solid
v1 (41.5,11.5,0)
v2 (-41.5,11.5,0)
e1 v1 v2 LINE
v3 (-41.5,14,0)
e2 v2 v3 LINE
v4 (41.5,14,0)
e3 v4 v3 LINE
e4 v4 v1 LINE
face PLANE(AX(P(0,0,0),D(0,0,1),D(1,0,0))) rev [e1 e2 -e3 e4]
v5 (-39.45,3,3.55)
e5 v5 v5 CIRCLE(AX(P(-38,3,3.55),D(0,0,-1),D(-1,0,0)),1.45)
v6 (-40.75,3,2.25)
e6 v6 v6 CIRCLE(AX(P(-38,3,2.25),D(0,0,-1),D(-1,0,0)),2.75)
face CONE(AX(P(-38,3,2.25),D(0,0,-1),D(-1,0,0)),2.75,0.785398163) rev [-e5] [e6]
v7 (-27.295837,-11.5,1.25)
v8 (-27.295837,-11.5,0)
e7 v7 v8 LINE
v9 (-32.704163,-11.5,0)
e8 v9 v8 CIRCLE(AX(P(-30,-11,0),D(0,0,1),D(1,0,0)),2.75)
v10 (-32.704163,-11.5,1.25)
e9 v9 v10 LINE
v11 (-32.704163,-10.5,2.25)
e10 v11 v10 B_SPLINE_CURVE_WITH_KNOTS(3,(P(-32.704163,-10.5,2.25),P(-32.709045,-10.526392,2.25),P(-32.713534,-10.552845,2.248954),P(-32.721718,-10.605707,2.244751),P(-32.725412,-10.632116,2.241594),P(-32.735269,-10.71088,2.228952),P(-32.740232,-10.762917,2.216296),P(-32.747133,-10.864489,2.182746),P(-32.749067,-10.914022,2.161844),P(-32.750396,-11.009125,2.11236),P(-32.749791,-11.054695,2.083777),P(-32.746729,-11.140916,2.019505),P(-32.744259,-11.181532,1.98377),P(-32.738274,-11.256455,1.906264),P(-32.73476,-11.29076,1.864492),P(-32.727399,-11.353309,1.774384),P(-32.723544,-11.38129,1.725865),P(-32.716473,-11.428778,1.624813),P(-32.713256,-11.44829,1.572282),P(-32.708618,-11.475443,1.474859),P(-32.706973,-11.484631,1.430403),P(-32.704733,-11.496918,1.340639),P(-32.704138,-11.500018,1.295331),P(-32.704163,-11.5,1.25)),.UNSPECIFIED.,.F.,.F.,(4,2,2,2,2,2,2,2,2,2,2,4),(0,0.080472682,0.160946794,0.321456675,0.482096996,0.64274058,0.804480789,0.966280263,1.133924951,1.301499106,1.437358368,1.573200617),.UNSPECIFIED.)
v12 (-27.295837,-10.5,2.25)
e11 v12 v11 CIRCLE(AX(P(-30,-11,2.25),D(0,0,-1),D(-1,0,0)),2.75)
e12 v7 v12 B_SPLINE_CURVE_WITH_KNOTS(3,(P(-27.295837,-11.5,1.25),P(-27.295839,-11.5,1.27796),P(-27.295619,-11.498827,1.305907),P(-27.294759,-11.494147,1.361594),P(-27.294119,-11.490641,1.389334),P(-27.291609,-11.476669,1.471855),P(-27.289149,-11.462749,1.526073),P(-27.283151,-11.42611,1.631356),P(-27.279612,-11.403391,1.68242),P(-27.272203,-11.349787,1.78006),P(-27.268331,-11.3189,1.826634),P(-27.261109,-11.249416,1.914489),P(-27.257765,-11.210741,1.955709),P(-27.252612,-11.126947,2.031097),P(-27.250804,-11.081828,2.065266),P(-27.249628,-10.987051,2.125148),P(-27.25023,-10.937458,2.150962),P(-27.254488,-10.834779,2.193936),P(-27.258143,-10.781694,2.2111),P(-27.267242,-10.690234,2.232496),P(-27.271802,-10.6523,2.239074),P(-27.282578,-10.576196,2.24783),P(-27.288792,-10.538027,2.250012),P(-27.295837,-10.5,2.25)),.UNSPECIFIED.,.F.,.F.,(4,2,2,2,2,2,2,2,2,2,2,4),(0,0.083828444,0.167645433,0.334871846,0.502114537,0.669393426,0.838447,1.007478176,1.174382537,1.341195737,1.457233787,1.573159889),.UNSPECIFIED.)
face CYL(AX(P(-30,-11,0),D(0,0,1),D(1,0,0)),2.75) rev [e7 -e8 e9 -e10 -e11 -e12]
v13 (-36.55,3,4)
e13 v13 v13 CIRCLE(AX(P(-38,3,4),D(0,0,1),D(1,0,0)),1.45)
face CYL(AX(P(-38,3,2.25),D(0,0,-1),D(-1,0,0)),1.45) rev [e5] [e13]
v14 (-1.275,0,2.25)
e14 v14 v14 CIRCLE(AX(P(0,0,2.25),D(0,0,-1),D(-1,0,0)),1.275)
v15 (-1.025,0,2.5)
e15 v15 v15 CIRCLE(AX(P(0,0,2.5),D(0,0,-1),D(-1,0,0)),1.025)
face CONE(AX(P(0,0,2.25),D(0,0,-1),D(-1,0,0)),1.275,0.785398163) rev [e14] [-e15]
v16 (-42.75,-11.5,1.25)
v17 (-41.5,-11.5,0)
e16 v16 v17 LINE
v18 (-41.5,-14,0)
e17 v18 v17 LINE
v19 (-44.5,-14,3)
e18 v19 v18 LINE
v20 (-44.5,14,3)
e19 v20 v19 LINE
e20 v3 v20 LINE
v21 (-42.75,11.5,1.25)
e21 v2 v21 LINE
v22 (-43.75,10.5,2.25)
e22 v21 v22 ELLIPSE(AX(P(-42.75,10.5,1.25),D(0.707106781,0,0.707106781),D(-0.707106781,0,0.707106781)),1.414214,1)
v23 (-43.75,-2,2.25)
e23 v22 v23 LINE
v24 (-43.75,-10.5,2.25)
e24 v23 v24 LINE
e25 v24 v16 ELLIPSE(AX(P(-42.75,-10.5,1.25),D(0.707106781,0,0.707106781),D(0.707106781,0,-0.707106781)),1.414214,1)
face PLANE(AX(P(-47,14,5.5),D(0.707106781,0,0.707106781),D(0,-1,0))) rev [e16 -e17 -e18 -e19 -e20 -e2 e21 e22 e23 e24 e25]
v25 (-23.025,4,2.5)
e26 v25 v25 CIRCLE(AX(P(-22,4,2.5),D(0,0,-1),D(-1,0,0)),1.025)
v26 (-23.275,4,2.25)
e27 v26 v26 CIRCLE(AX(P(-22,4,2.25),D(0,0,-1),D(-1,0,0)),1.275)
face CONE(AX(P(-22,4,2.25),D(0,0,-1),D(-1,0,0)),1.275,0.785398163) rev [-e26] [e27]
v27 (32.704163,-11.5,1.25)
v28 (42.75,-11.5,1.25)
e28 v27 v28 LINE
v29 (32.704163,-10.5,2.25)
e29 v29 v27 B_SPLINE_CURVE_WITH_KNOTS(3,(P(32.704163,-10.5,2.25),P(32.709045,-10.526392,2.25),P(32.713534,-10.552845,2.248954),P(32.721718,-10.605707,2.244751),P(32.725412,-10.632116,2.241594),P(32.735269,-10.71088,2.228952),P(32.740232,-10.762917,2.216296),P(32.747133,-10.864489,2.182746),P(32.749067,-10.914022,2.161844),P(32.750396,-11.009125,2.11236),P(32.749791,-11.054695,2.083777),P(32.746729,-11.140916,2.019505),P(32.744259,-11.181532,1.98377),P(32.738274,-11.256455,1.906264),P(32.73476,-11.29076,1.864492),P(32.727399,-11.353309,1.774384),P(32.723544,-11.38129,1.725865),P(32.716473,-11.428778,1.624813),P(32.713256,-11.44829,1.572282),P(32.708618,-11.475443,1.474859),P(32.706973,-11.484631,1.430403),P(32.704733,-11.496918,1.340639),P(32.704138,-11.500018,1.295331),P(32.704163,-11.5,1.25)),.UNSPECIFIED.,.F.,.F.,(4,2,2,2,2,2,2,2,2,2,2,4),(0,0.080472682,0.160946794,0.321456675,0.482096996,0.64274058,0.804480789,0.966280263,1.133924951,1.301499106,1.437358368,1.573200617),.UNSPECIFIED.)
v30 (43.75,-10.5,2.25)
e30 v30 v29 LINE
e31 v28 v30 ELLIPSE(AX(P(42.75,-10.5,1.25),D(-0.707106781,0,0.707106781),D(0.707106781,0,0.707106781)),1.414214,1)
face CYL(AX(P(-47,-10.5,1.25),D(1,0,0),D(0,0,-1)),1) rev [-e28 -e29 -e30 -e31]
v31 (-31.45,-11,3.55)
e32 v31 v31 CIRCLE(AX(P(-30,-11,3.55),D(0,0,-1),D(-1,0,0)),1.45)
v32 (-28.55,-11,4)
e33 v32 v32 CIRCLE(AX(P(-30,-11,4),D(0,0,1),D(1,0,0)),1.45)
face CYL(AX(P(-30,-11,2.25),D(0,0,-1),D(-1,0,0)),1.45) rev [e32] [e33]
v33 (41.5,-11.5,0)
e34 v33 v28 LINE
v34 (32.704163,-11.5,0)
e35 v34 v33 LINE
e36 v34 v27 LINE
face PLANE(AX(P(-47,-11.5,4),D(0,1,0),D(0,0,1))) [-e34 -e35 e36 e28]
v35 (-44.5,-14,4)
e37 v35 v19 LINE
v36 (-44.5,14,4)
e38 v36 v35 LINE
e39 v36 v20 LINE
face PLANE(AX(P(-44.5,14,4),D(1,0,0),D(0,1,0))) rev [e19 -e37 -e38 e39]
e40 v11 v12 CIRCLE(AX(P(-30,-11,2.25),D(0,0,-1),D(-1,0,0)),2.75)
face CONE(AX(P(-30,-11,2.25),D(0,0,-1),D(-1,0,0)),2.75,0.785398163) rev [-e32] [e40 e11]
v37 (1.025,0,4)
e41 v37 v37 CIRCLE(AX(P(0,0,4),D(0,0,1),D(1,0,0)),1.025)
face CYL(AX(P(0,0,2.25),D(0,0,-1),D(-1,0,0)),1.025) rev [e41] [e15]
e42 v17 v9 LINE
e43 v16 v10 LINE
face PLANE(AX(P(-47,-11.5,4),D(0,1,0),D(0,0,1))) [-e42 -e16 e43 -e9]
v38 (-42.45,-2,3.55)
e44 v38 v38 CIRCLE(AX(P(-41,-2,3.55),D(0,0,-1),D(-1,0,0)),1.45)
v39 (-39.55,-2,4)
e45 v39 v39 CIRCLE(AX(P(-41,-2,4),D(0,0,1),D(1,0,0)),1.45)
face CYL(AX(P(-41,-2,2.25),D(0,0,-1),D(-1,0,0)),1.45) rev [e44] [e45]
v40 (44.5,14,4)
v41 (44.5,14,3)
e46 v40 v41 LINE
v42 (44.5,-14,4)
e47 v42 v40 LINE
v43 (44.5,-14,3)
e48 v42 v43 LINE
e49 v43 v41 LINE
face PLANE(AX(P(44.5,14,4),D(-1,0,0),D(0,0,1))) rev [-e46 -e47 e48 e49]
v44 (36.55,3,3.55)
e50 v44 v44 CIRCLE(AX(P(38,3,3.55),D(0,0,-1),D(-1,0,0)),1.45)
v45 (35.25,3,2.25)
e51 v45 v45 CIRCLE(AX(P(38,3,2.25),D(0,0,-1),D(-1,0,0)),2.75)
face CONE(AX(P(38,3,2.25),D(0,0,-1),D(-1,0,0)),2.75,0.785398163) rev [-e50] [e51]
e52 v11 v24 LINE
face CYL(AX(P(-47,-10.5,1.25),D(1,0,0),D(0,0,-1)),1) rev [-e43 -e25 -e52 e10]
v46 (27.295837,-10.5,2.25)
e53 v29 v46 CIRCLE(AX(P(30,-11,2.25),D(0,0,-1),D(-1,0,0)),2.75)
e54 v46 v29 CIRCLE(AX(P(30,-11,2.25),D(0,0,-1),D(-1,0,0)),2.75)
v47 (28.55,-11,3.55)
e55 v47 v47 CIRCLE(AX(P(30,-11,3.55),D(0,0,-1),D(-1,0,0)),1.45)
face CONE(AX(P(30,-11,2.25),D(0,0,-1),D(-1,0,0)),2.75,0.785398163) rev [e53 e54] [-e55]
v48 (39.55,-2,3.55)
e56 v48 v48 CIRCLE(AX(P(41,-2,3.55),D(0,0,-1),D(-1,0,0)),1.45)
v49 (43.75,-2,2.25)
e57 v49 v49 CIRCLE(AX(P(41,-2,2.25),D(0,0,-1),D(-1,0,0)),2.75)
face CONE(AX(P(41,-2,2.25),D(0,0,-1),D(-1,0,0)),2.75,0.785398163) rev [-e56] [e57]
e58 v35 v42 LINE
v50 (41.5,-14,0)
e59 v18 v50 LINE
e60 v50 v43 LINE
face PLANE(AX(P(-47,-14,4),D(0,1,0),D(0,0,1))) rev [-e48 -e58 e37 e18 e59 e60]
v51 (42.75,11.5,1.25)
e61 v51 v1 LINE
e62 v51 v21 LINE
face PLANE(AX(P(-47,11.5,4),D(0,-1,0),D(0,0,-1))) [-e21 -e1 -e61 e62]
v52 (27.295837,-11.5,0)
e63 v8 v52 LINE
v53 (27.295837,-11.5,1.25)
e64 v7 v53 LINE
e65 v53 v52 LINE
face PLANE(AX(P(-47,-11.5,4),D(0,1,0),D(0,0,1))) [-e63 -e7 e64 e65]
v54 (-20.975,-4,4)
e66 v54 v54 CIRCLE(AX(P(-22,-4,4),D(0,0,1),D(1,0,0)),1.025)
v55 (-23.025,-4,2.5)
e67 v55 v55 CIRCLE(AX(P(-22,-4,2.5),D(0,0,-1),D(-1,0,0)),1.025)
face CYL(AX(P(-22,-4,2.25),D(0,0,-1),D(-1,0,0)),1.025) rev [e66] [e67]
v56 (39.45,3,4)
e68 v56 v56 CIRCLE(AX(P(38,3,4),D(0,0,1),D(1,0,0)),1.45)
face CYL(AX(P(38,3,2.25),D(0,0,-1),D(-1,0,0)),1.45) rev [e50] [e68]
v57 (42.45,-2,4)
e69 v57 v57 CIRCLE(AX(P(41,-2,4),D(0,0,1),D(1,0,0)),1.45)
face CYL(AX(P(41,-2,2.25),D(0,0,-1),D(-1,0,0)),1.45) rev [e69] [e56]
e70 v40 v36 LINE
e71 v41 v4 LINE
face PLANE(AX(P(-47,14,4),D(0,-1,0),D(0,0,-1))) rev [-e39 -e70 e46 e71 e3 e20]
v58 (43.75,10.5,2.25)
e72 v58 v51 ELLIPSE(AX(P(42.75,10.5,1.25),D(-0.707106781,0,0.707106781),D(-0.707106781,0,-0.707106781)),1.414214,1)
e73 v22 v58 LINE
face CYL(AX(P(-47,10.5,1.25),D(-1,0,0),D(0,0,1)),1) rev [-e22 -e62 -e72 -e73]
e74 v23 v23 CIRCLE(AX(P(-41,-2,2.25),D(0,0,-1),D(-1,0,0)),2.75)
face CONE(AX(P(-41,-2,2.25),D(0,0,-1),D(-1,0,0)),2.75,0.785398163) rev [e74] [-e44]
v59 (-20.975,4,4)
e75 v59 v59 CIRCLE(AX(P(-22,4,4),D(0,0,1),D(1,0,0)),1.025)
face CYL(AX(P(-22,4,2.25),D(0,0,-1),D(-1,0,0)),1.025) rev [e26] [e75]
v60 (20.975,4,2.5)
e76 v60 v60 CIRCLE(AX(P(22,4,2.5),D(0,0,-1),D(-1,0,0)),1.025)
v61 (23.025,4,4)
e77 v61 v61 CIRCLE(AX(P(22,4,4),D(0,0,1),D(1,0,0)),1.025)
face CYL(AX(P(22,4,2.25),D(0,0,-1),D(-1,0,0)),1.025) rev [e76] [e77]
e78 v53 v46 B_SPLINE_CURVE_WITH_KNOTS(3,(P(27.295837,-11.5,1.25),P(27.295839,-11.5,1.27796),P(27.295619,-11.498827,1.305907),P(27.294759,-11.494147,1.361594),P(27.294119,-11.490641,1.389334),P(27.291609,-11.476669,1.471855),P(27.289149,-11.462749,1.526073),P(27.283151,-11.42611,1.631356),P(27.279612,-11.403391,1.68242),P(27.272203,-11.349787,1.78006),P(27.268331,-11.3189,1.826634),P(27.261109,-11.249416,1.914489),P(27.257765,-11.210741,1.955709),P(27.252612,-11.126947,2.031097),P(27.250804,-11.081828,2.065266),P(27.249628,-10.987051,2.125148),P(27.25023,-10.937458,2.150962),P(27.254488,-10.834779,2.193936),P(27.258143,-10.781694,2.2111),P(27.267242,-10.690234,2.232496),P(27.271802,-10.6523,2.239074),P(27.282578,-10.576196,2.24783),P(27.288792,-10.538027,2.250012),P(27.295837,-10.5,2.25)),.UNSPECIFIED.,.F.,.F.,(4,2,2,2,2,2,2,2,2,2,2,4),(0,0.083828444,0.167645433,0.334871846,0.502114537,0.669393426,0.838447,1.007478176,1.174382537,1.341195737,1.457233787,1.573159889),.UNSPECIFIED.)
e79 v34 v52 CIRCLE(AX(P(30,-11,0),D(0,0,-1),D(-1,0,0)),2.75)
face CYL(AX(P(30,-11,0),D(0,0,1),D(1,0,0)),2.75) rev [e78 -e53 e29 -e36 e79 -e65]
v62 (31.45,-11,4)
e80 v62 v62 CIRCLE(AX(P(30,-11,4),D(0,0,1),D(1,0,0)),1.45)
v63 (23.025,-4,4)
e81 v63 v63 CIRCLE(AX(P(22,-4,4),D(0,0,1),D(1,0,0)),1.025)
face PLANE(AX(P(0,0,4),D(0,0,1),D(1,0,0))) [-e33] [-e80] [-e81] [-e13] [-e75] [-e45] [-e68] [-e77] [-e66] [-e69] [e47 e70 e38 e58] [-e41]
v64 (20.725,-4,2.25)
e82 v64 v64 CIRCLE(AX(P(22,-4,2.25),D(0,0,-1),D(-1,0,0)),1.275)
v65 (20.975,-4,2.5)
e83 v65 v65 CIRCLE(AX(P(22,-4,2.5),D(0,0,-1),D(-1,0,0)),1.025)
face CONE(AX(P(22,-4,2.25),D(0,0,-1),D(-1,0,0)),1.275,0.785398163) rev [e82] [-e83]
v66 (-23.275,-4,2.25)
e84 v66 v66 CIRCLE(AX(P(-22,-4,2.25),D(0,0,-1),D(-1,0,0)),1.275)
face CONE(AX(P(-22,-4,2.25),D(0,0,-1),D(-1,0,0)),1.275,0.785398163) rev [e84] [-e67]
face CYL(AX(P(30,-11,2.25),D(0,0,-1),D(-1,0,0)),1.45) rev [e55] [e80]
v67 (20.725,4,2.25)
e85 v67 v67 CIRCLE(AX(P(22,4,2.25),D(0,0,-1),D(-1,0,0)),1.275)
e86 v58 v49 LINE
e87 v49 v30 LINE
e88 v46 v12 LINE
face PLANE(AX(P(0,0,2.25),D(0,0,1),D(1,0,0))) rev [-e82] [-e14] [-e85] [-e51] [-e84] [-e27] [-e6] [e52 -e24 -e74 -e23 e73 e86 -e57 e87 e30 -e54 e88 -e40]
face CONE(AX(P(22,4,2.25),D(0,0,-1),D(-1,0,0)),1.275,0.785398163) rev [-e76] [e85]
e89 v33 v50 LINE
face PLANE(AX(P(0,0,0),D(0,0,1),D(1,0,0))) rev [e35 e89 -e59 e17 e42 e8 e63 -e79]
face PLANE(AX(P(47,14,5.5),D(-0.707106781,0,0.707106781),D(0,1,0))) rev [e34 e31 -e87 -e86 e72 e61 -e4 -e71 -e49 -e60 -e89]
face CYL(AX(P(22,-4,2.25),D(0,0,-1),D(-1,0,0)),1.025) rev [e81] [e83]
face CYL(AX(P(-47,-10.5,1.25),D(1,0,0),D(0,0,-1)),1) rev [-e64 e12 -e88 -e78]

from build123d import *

# Parameters (mm, degrees)
SKETCH1_W                                      = 94
SKETCH1_H                                      = 28
BOSS_EXTRUDE1_DEPTH                            = 4
CHAMFER1_SIZE                                  = 5.5
CUT_EXTRUDE2_DEPTH                             = 48.772900268
CUT_EXTRUDE2_DEPTH_BACK                        = 48.772900268
SKETCH9_W                                      = 30.391833943
SKETCH9_H                                      = 28
SHELL1_START                                   = -11.5
SHELL1_DEPTH                                   = 23
FILLET1_R                                      = 1
CSK_FOR_M2_5_FLAT_HEAD_MACHINE_SCREW1_AT_COUNT = 2
CSK_FOR_M2_5_FLAT_HEAD_MACHINE_SCREW1_AT_PITCH = 5.830951895
CSK_FOR_M2_5_FLAT_HEAD_MACHINE_SCREW_2_COUNT   = 2
CSK_FOR_M2_5_FLAT_HEAD_MACHINE_SCREW_2_PITCH   = 16.124515497
SKETCH8_R                                      = 2.75
CUT_EXTRUDE1_DEPTH                             = 47.704523336
M2_5X0_45_TAPPED_HOLE1_D                       = 2.05
M2_5X0_45_TAPPED_HOLE1_DEPTH                   = 6
M2_5X0_45_TAPPED_HOLE1_CSINK_D                 = 2.55
M2_5X0_45_TAPPED_HOLE1_CSINK_ANGLE             = 90
M2_5X0_45_TAPPED_HOLE1_TIP                     = 0.615882135


# Read off the part's stored shape, not the designer's step: Shell1
with BuildPart() as part:
    # Sketch1 → Boss-Extrude1 (new body)
    with BuildSketch(Plane.XY):
        Rectangle(SKETCH1_W, SKETCH1_H)
    extrude(amount=BOSS_EXTRUDE1_DEPTH)

    # Chamfer1
    # the kernel refuses this chamfer: 5.5 mm, written as the material it takes off along each edge
    with BuildSketch(Plane(origin=(47, 28.144256434, 0), x_dir=(0.027495876610585942, 0, 0.9996219169112968), z_dir=(0, -1, 0)), Plane(origin=(-47, -28.144256434, 0), x_dir=(-0.027495876610585942, 0, 0.9996219169112968), z_dir=(0, 1, 0))) as chamfer1_piece_1:
        Polygon((CHAMFER1_SIZE * 0.999621916911, CHAMFER1_SIZE * 0.0274958766106), (-CHAMFER1_SIZE * 0.0274958766106, CHAMFER1_SIZE * 0.999621916911), (0, 0), align=None)
    extrude(amount=56.288512868, mode=Mode.SUBTRACT)

    # Sketch9 → Cut-Extrude2 (cut, two sides: drawn at the far end of the back side and taken through both)
    with BuildSketch(Plane(origin=(0, 0, 0), x_dir=(-1, 0, 0), z_dir=(0, 0, -1)).offset(-CUT_EXTRUDE2_DEPTH_BACK)):
        with Locations((-59.695916972, 0)):
            Rectangle(SKETCH9_W, SKETCH9_H)
        with Locations((59.695916972, 0)):
            Rectangle(SKETCH9_W, SKETCH9_H)
    extrude(amount=CUT_EXTRUDE2_DEPTH + CUT_EXTRUDE2_DEPTH_BACK, mode=Mode.SUBTRACT)

    # Shell1 outline → Shell1 (cut)
    with BuildSketch(Plane(origin=(0, 0, 0), x_dir=(1, 0, 0), z_dir=(0, 1, 0)).offset(SHELL1_START)):
        Polygon((-41.5, 0), (-43.75, -2.25), (43.75, -2.25), (41.5, 0), align=None)
    extrude(amount=SHELL1_DEPTH, mode=Mode.SUBTRACT)

    # Fillet1
    fillet1_edges = [part.edges().sort_by_distance(p)[0] for p in [
        (0, 11.5, 2.25),
        (0, -11.5, 2.25),
    ]]
    fillet(fillet1_edges, radius=FILLET1_R)

    # Sketch5 → CSK for M2.5 Flat Head Machine Screw1 (revolve, cut)
    with BuildSketch(Plane(origin=(38, 3, 2.25), x_dir=(0, 1, 0), z_dir=(1, 0, 0))):
        Polygon((0, 0), (0, 7.321247898), (1.45, 6.45), (1.45, 1.3), (2.75, 0), align=None)
    csk_for_m2_5_flat_head_machine_screw1 = revolve(axis=Axis((38, 3, -4.1), (0, 0, 1)), mode=Mode.SUBTRACT)

    # CSK for M2.5 Flat Head Machine Screw1 at: CSK for M2.5 Flat Head Machine Screw1 ×2
    with Locations(*[Vector(0.5144957554275275, -0.8574929257125438, 0) * (i * CSK_FOR_M2_5_FLAT_HEAD_MACHINE_SCREW1_AT_PITCH) for i in range(1, CSK_FOR_M2_5_FLAT_HEAD_MACHINE_SCREW1_AT_COUNT)]):
        add(csk_for_m2_5_flat_head_machine_screw1, mode=Mode.SUBTRACT)

    # CSK for M2.5 Flat Head Machine Screw 2: CSK for M2.5 Flat Head Machine Screw1 ×2
    with Locations(*[Vector(-0.4961389383568334, -0.8682431421244594, 0) * (i * CSK_FOR_M2_5_FLAT_HEAD_MACHINE_SCREW_2_PITCH) for i in range(1, CSK_FOR_M2_5_FLAT_HEAD_MACHINE_SCREW_2_COUNT)]):
        add(csk_for_m2_5_flat_head_machine_screw1, mode=Mode.SUBTRACT)

    # Sketch8 → Cut-Extrude1 (cut, through all)
    with BuildSketch(Plane(origin=(0, 0, 2.25), x_dir=(-1, 0, 0), z_dir=(0, 0, -1))):
        with Locations((-30, -11)):
            Circle(SKETCH8_R)
    cut_extrude1 = extrude(amount=CUT_EXTRUDE1_DEPTH, mode=Mode.SUBTRACT)

    # Mirror1: CSK for M2.5 Flat Head Machine Screw1, Cut-Extrude1 across plane
    add(csk_for_m2_5_flat_head_machine_screw1.mirror(Plane(origin=(0, 0, 0), x_dir=(0, 0, 1), z_dir=(1, 0, 0))), mode=Mode.SUBTRACT)
    add(cut_extrude1.mirror(Plane(origin=(0, 0, 0), x_dir=(0, 0, 1), z_dir=(1, 0, 0))), mode=Mode.SUBTRACT)

    # Mirror1 copy 1 sketch → Mirror1 copy 1 (revolve, cut)
    with BuildSketch(Plane(origin=(-41, -2, 2.25), x_dir=(0, 1, 0), z_dir=(-1, 0, 0))):
        Polygon((0, 0), (0, -7.321247898), (1.45, -6.45), (1.45, -1.3), (2.75, 0), align=None)
    revolve(axis=Axis((-41, -2, -4.1), (0, 0, -1)), mode=Mode.SUBTRACT)

    # Mirror1 copy 2 sketch → Mirror1 copy 2 (revolve, cut)
    with BuildSketch(Plane(origin=(-30, -11, 2.25), x_dir=(0, 1, 0), z_dir=(-1, 0, 0))):
        Polygon((0, 0), (0, -7.321247898), (1.45, -6.45), (1.45, -1.3), (2.75, 0), align=None)
    revolve(axis=Axis((-30, -11, -4.1), (0, 0, -1)), mode=Mode.SUBTRACT)

    # M2.5x0.45 Tapped Hole1
    with Locations(Plane(origin=(0, 0, 2.25), x_dir=(-1, 0, 0), z_dir=(0, 0, -1))):
        with Locations((0, 0), (-22, 4), (-22, -4), (22, -4), (22, 4)):
            CounterSinkHole(M2_5X0_45_TAPPED_HOLE1_D / 2, M2_5X0_45_TAPPED_HOLE1_CSINK_D / 2, depth=M2_5X0_45_TAPPED_HOLE1_DEPTH, counter_sink_angle=M2_5X0_45_TAPPED_HOLE1_CSINK_ANGLE)
            with Locations((0, 0, -(M2_5X0_45_TAPPED_HOLE1_DEPTH + M2_5X0_45_TAPPED_HOLE1_TIP / 2))):  # 118° drill point
                Cone(0, M2_5X0_45_TAPPED_HOLE1_D / 2, M2_5X0_45_TAPPED_HOLE1_TIP, mode=Mode.SUBTRACT)


solid = part.part
